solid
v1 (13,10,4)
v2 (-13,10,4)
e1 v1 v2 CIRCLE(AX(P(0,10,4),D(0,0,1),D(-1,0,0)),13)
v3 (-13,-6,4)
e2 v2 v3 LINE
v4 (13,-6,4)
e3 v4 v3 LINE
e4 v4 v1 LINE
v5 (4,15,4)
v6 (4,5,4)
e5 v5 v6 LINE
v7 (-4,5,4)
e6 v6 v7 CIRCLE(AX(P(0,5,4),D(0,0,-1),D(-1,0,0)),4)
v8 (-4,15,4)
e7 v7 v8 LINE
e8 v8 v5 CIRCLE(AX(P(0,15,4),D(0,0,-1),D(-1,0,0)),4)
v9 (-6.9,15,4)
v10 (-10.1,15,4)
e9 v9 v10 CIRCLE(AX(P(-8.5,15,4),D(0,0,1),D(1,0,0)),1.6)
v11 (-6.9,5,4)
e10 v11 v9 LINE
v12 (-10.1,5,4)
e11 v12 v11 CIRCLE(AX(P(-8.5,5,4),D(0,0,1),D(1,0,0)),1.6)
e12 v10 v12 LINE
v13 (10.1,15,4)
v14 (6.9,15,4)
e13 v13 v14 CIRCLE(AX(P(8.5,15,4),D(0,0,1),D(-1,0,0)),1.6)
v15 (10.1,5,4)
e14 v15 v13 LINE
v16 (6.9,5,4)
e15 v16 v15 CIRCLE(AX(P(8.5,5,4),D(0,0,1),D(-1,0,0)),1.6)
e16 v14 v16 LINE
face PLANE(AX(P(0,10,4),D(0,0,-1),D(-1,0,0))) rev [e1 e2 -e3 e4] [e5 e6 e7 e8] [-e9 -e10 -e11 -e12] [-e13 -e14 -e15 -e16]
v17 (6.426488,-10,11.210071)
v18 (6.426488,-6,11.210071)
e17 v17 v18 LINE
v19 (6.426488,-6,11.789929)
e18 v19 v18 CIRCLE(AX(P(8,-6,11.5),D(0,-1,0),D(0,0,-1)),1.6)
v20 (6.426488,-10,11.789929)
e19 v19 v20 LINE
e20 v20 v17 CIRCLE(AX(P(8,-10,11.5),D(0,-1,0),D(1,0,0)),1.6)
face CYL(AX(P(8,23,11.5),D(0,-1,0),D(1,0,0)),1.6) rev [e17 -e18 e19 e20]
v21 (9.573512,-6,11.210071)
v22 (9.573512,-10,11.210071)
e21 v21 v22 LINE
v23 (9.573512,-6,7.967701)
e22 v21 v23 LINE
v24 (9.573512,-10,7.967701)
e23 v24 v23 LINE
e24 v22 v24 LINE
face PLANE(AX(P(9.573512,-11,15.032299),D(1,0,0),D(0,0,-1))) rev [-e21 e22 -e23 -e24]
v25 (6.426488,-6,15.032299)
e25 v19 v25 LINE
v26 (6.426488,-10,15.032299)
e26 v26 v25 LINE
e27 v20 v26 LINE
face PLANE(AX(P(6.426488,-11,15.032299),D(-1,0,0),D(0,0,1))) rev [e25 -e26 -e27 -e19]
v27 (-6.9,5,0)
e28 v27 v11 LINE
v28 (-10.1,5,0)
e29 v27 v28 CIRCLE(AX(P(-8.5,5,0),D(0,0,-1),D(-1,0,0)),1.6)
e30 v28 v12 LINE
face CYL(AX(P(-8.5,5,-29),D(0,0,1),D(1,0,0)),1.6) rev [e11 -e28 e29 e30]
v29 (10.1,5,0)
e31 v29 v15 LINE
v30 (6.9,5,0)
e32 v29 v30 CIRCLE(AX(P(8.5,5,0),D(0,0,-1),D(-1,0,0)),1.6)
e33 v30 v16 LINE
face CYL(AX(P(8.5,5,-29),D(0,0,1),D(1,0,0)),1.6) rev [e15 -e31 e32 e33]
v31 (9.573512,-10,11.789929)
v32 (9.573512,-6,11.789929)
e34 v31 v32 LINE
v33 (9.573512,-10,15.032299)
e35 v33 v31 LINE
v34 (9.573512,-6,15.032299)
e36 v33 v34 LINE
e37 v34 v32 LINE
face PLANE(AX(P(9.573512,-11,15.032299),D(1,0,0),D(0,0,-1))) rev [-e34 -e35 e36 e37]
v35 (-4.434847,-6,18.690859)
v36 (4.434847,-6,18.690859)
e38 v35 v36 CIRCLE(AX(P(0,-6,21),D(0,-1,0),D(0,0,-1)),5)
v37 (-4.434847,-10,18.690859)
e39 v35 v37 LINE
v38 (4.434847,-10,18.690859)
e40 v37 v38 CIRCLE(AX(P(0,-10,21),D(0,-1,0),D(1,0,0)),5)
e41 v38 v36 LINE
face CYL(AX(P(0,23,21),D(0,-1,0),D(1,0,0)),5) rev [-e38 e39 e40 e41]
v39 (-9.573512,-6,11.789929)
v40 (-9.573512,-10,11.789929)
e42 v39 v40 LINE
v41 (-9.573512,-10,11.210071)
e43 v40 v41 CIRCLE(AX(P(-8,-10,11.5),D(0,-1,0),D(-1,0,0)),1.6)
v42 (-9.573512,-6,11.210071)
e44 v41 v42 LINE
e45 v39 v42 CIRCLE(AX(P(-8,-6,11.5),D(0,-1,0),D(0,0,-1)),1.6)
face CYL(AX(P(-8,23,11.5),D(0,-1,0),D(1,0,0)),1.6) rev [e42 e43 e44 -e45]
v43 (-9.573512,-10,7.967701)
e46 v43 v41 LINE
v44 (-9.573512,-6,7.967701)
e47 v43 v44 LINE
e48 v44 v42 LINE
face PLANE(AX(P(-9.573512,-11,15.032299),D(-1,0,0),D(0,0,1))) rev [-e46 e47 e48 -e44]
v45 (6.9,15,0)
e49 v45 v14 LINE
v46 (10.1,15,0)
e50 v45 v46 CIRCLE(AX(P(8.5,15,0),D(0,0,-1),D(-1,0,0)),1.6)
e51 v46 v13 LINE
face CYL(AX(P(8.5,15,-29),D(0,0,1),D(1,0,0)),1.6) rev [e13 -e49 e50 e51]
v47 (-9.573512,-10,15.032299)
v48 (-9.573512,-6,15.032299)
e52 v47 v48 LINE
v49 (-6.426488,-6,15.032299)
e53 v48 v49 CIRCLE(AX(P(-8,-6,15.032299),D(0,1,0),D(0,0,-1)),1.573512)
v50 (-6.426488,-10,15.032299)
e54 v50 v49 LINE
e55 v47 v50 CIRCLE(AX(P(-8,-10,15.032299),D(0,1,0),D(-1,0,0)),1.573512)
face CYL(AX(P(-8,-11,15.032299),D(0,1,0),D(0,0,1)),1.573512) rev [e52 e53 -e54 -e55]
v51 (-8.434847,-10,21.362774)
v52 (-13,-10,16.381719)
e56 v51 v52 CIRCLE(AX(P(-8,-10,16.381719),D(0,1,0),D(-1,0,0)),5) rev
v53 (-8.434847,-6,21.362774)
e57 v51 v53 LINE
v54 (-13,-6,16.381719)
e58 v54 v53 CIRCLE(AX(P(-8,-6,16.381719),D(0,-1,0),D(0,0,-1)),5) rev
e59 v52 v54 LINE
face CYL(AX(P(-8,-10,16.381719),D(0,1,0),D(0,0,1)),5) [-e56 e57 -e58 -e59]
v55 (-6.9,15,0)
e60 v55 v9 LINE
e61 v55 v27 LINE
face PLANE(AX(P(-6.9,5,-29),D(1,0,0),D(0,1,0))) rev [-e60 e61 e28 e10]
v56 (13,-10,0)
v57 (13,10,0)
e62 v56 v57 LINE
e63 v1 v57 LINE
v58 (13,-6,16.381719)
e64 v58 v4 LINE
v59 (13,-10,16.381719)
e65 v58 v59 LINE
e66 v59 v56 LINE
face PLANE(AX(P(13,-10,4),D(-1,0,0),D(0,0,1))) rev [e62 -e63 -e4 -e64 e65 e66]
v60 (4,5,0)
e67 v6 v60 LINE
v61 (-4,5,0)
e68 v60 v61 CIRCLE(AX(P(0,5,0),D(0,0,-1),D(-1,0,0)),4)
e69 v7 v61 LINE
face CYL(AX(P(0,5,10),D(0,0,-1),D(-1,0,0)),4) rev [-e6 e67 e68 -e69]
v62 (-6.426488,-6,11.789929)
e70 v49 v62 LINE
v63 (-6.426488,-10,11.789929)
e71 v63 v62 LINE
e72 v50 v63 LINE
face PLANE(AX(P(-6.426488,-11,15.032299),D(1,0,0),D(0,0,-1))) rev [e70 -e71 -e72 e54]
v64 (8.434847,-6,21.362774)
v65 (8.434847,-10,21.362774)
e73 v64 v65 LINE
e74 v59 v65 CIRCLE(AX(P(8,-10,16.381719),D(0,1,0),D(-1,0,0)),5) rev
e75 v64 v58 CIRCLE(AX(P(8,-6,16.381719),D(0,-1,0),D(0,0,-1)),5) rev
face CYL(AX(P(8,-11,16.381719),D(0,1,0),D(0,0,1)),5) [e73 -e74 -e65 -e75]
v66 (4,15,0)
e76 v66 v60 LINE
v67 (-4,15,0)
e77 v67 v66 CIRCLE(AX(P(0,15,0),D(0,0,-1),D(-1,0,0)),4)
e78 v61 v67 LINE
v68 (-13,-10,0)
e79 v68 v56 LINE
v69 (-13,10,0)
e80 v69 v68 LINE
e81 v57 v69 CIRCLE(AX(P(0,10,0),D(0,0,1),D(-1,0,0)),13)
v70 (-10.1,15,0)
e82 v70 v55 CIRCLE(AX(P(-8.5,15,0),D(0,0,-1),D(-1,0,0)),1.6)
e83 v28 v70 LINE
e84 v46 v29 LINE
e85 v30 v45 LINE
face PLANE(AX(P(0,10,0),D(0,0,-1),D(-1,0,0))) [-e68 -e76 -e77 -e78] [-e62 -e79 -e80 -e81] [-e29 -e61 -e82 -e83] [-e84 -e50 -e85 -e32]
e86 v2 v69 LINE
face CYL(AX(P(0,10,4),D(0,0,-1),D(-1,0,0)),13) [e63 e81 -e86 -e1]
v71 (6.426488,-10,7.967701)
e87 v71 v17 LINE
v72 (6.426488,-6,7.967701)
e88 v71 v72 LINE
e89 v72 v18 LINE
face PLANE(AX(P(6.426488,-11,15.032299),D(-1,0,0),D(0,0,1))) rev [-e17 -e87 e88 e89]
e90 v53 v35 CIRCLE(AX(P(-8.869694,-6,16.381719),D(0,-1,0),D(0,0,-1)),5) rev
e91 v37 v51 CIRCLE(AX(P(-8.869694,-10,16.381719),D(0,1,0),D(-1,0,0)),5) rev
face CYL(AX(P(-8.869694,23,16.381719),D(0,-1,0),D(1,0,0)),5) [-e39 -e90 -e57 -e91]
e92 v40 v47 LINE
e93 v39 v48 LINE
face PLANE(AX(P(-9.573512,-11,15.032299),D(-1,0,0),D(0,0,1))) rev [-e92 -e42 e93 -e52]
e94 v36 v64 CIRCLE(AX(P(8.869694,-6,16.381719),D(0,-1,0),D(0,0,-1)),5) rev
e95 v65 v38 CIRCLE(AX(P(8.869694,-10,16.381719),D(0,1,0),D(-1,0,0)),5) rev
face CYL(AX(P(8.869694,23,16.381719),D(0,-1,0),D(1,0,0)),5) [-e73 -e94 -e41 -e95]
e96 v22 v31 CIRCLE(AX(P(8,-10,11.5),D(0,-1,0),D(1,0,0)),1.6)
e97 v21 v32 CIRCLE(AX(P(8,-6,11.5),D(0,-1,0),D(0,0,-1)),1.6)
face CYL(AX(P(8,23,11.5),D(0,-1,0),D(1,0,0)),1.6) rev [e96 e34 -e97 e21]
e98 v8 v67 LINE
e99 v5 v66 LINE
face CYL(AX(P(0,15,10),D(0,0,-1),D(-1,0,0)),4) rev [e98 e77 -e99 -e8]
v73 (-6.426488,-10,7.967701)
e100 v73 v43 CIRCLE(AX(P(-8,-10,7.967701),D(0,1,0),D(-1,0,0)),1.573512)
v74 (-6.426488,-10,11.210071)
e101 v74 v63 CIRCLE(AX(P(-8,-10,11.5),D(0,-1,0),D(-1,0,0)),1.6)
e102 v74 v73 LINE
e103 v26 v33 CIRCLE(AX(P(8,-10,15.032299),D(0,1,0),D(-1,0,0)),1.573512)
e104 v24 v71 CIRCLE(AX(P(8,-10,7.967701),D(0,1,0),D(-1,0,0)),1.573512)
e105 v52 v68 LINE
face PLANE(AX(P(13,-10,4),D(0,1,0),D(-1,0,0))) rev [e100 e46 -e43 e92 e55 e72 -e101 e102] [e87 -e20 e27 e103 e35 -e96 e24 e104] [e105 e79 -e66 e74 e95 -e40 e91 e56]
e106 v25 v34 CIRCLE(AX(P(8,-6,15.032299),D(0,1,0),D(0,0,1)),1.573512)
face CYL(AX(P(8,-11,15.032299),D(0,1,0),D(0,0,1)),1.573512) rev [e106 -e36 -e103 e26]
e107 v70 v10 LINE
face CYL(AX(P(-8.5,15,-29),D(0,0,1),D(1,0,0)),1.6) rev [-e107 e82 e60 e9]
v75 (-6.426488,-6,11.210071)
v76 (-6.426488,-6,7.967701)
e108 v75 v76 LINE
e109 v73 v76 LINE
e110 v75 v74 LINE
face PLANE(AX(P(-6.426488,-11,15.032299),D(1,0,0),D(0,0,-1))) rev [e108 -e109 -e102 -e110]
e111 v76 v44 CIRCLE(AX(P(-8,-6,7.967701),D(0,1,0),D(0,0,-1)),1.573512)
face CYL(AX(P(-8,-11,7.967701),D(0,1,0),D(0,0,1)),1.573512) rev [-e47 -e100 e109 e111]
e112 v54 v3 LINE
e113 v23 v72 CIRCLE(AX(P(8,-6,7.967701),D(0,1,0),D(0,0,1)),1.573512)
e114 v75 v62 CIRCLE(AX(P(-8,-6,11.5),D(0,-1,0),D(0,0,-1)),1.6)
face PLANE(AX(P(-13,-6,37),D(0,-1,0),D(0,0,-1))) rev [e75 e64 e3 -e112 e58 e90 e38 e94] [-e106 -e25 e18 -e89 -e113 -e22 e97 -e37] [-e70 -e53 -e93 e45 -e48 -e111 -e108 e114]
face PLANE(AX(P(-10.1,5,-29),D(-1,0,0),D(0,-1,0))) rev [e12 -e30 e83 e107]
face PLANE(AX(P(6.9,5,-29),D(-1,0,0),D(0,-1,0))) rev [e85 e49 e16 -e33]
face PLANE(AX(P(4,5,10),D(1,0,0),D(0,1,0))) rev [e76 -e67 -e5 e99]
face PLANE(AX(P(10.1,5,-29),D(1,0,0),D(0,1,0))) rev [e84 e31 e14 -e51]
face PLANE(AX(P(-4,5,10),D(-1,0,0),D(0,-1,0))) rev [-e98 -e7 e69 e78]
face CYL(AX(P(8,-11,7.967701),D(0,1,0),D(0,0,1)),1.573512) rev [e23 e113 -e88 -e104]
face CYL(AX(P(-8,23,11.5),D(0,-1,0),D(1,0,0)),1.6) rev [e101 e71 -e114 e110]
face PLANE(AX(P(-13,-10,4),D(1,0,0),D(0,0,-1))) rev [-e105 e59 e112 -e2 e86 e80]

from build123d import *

# Parameters (mm, degrees)
SKETCH1_R           = 4
SKETCH1_R_2         = 1.6
BOSS_EXTRUDE1_DEPTH = 4
SKETCH2_W           = 26
SKETCH2_H           = 4
BOSS_EXTRUDE2_DEPTH = 33
SKETCH3_R           = 5
SKETCH3_R_2         = 1.6
CUT_EXTRUDE1_DEPTH  = 33
CUT_EXTRUDE2_DEPTH  = 33
CUT_EXTRUDE3_DEPTH  = 5
SKETCH7_W           = 26
SKETCH7_H           = 15.618281376
CUT_EXTRUDE4_DEPTH  = 5
FILLET1_R           = 5
CUT_EXTRUDE5_DEPTH  = 10


with BuildPart() as part:
    # Sketch1 → Boss-Extrude1 (new body)
    with BuildSketch(Plane.XY):
        with BuildLine():
            Line((13, -10), (-13, -10))
            Line((-13, -10), (-13, 10))
            ThreePointArc((-13, 10), (0, 23), (13, 10))
            Line((13, 10), (13, -10))
        make_face()
        with Locations((0, 10)):
            Circle(SKETCH1_R, mode=Mode.SUBTRACT)
        with Locations((-8.5, 10)):
            Circle(SKETCH1_R_2, mode=Mode.SUBTRACT)
        with Locations(Location((8.5, 10, 0), (0, 0, 180))):
            Circle(SKETCH1_R_2, mode=Mode.SUBTRACT)
    extrude(amount=BOSS_EXTRUDE1_DEPTH)

    # Sketch2 → Boss-Extrude2 (add)
    with BuildSketch(Plane.XY.offset(4)):
        with Locations((0, -8)):
            Rectangle(SKETCH2_W, SKETCH2_H)
    extrude(amount=BOSS_EXTRUDE2_DEPTH)

    # Sketch3 → Cut-Extrude1 (cut)
    with BuildSketch(Plane.XZ.offset(10)):
        with Locations((0, 21)):
            Circle(SKETCH3_R)
        with Locations((-8, 25.5)):
            Circle(SKETCH3_R_2)
        with Locations(Location((8, 25.5, 0), (0, 0, 270))):
            Circle(SKETCH3_R_2)
        with Locations((8, 11.5)):
            Circle(SKETCH3_R_2)
        with Locations(Location((-8, 11.5, 0), (0, 0, 270))):
            Circle(SKETCH3_R_2)
    extrude(amount=-CUT_EXTRUDE1_DEPTH, mode=Mode.SUBTRACT)

    # Sketch4 → Cut-Extrude2 (cut)
    with BuildSketch(Plane.XY.offset(4)):
        with BuildLine():
            Line((-10.1, 5), (-10.1, 15))
            ThreePointArc((-10.1, 15), (-8.5, 16.6), (-6.9, 15))
            Line((-6.9, 15), (-6.9, 5))
            ThreePointArc((-6.9, 5), (-8.5, 3.4), (-10.1, 5))
        make_face()
        with BuildLine():
            Line((10.1, 5), (10.1, 15))
            ThreePointArc((10.1, 15), (8.5, 16.6), (6.9, 15))
            Line((6.9, 15), (6.9, 5))
            ThreePointArc((6.9, 5), (8.5, 3.4), (10.1, 5))
        make_face()
    extrude(amount=-CUT_EXTRUDE2_DEPTH, mode=Mode.SUBTRACT)

    # Sketch6 → Cut-Extrude3 (cut)
    with BuildSketch(Plane(origin=(0, -6, 0), x_dir=(1, 0, 0), z_dir=(0, 1, 0))):
        with BuildLine():
            Line((6.42648755, -15.03229904), (6.42648755, -7.96770096))
            ThreePointArc((6.42648755, -7.96770096), (8, -6.39418851), (9.57351245, -7.96770096))
            Line((9.57351245, -7.96770096), (9.57351245, -15.03229904))
            ThreePointArc((9.57351245, -15.03229904), (8, -16.60581149), (6.42648755, -15.03229904))
        make_face()
        with BuildLine():
            Line((-6.42648755, -15.03229904), (-6.42648755, -7.96770096))
            ThreePointArc((-6.42648755, -7.96770096), (-8, -6.39418851), (-9.57351245, -7.96770096))
            Line((-9.57351245, -7.96770096), (-9.57351245, -15.03229904))
            ThreePointArc((-9.57351245, -15.03229904), (-8, -16.60581149), (-6.42648755, -15.03229904))
        make_face()
    extrude(amount=-CUT_EXTRUDE3_DEPTH, mode=Mode.SUBTRACT)

    # Sketch7 → Cut-Extrude4 (cut)
    with BuildSketch(Plane(origin=(0, -6, 0), x_dir=(1, 0, 0), z_dir=(0, 1, 0))):
        with Locations((0, -29.190859312)):
            Rectangle(SKETCH7_W, SKETCH7_H)
    extrude(amount=-CUT_EXTRUDE4_DEPTH, mode=Mode.SUBTRACT)

    # Fillet1
    # the kernel refuses this fillet: 5 mm, written as the material it takes off along each edge
    with BuildSketch(Plane(origin=(-13, 6.5, 21.381718624), x_dir=(0, 0, -1), z_dir=(0, -1, 0))) as fillet1_piece_1:
        with BuildLine():
            CenterArc((FILLET1_R, FILLET1_R), FILLET1_R, 180, 90)
            Line((0, FILLET1_R), (0, 0))
            Line((0, 0), (FILLET1_R, 0))
        make_face()
    extrude(amount=29, mode=Mode.SUBTRACT)
    with BuildSketch(Plane(origin=(13, 6.5, 21.381718624), x_dir=(0, 0, -1), z_dir=(0, -1, 0))) as fillet1_piece_2:
        with BuildLine():
            CenterArc((FILLET1_R, -FILLET1_R), FILLET1_R, 90, 90)
            Line((0, -FILLET1_R), (0, 0))
            Line((0, 0), (FILLET1_R, 0))
        make_face()
    extrude(amount=29, mode=Mode.SUBTRACT)
    with BuildSketch(Plane(origin=(4.985407796, 3.710716282, 21.381718624), x_dir=(-0.20045131167218372, 0, -0.9797036652217348), z_dir=(0, -1, 0))) as fillet1_piece_3:
        with BuildLine():
            CenterArc((4.119908, 4.807706292), FILLET1_R, 191.563351745, 62.494863063)
            Line((-0.778610326, 3.805449733), (0, 0))
            ThreePointArc((0, 0), (1.373302667, 0.192293708), (2.746605333, 0))
        make_face()
    extrude(amount=23.421432563, mode=Mode.SUBTRACT)
    with BuildSketch(Plane(origin=(-4.985407796, 3.710716282, 21.381718624), x_dir=(-1, 0, 0), z_dir=(0, -1, 0))) as fillet1_piece_4:
        with BuildLine():
            CenterArc((3.884286513, 5), FILLET1_R, 207.505136937, 62.494863063)
            ThreePointArc((-0.550560642, 2.690859312), (-0.08688947, 1.383975182), (0, 0))
            Line((0, 0), (3.884286513, 0))
        make_face()
    extrude(amount=23.421432563, mode=Mode.SUBTRACT)

    # Sketch8 → Cut-Extrude5 (cut)
    with BuildSketch(Plane(origin=(0, 0, 0), x_dir=(-1, 0, 0), z_dir=(0, 0, -1))):
        with BuildLine():
            Line((-4, 5), (-4, 15))
            ThreePointArc((-4, 15), (0, 19), (4, 15))
            Line((4, 15), (4, 5))
            ThreePointArc((4, 5), (0, 1), (-4, 5))
        make_face()
    extrude(amount=-CUT_EXTRUDE5_DEPTH, mode=Mode.SUBTRACT)


solid = part.part
